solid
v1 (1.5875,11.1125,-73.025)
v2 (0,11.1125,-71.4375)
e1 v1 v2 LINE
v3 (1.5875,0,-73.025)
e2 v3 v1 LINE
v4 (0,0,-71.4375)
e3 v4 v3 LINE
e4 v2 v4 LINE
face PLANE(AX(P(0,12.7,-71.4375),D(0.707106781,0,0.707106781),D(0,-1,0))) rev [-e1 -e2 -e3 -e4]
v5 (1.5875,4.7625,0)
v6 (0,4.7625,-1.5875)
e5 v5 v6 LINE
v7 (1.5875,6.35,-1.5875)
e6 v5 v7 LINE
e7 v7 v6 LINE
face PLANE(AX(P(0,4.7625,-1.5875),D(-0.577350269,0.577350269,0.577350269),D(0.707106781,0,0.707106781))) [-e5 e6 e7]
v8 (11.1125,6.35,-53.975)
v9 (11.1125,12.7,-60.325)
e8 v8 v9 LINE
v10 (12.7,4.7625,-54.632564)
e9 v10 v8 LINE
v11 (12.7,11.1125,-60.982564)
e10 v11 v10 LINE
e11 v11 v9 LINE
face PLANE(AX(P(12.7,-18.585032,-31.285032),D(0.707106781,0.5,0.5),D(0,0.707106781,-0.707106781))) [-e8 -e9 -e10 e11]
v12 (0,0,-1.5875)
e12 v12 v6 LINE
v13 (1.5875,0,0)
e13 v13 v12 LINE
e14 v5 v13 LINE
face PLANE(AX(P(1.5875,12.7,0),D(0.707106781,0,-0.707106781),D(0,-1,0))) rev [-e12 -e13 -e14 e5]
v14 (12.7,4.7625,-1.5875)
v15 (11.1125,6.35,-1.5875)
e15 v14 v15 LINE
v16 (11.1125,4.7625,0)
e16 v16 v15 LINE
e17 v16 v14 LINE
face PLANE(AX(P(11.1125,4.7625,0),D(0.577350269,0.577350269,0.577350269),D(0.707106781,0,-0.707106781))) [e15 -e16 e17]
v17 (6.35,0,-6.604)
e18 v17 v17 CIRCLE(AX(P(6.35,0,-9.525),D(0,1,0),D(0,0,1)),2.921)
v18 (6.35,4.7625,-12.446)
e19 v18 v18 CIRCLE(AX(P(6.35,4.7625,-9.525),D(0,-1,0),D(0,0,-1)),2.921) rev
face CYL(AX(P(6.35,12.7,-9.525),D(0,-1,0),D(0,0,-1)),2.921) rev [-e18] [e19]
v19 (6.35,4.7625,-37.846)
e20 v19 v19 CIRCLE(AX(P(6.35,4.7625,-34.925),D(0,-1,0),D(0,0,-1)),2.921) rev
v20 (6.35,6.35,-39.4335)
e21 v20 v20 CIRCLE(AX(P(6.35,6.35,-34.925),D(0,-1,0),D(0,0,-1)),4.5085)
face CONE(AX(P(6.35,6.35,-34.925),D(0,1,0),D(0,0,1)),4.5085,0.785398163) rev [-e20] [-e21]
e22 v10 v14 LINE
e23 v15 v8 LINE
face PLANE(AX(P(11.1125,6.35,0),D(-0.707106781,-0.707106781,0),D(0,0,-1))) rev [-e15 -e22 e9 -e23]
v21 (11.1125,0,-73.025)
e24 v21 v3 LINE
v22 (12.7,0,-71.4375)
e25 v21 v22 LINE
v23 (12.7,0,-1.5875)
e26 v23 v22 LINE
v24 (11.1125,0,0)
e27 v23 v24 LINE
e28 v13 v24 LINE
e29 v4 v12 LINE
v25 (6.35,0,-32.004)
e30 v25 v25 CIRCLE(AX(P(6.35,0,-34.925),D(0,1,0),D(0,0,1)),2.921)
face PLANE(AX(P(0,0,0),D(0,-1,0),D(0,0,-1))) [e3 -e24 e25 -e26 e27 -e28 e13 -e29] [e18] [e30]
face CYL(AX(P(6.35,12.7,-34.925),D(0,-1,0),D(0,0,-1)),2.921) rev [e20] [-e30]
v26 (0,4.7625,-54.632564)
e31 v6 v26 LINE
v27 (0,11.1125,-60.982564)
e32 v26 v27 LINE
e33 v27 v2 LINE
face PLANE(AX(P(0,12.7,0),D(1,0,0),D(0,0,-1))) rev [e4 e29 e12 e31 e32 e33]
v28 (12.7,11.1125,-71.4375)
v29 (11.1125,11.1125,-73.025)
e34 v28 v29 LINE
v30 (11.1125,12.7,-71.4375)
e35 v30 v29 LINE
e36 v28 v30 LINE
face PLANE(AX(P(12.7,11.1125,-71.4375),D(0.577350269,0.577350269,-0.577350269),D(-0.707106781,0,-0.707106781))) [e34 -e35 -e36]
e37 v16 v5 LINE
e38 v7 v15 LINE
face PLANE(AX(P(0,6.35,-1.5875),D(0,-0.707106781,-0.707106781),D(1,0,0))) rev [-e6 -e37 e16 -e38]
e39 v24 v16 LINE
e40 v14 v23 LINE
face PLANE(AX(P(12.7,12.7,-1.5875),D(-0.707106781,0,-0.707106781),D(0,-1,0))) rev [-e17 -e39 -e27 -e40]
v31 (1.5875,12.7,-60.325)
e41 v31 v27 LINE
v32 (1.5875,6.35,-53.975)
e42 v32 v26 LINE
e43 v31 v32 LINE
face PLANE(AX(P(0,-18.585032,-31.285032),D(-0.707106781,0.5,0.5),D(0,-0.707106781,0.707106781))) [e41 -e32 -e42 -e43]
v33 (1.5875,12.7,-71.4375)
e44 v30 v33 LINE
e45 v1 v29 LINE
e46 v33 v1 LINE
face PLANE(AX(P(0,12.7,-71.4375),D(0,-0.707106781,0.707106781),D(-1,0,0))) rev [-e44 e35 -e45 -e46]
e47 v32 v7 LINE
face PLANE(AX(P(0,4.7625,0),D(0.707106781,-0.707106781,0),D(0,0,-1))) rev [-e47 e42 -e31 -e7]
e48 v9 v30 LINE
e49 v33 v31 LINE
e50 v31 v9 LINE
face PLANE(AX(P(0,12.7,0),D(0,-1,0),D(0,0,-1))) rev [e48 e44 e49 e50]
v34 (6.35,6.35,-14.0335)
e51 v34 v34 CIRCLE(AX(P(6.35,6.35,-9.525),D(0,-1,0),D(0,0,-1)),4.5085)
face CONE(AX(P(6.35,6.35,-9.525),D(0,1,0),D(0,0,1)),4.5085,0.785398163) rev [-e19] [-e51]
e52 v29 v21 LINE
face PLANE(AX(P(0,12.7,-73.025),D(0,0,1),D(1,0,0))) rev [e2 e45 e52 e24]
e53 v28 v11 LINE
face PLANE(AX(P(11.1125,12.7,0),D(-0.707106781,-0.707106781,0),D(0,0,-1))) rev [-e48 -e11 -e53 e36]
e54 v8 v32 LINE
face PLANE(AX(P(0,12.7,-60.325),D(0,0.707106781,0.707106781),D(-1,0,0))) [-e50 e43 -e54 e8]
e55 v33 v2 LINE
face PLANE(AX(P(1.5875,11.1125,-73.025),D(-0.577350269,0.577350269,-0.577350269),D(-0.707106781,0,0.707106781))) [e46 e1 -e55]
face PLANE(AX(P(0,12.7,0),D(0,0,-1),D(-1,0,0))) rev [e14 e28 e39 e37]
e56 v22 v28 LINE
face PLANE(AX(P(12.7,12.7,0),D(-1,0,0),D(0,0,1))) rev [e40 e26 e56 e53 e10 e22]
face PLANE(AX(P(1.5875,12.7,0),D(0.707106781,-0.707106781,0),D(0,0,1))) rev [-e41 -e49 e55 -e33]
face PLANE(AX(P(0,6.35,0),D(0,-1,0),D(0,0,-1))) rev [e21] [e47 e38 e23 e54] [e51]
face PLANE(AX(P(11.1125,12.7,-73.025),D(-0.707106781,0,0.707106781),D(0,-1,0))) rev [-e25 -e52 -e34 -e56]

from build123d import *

# Parameters (mm, degrees)
SKETCH1_W           = 12.7
SKETCH1_H           = 73.025
SKETCH1_R           = 2.921
BOSS_EXTRUDE1_DEPTH = 12.7
SKETCH2_W           = 60.325
SKETCH2_H           = 6.35
CUT_EXTRUDE1_DEPTH  = 76.201267443
CHAMFER1_SIZE       = 6.35


# Some blends are built 0.0001 mm under size
with BuildPart() as part:
    # Sketch1 → Boss-Extrude1 (new body)
    with BuildSketch(Plane(origin=(0, 0, 0), x_dir=(1, 0, 0), z_dir=(0, 1, 0))):
        with Locations((6.35, 36.5125)):
            Rectangle(SKETCH1_W, SKETCH1_H)
        with Locations(Location((6.35, 9.525, 0), (0, 0, 270))):
            Circle(SKETCH1_R, mode=Mode.SUBTRACT)
        with Locations(Location((6.35, 34.925, 0), (0, 0, 270))):
            Circle(SKETCH1_R, mode=Mode.SUBTRACT)
    extrude(amount=BOSS_EXTRUDE1_DEPTH)

    # Sketch2 → Cut-Extrude1 (cut, through all)
    with BuildSketch(Plane(origin=(12.7, 0, 0), x_dir=(0, 0, -1), z_dir=(1, 0, 0))):
        with Locations((30.1625, 9.525)):
            Rectangle(SKETCH2_W, SKETCH2_H)
    extrude(amount=-CUT_EXTRUDE1_DEPTH, mode=Mode.SUBTRACT)

    # Chamfer1
    chamfer1_edges = [part.edges().sort_by_distance(p)[0] for p in [
        (6.35, 6.35, -60.325),
    ]]
    chamfer(chamfer1_edges, length=CHAMFER1_SIZE - 0.0001)  # a hair under: the kernel refuses the full size

    # Chamfer2
    # the kernel refuses this chamfer: 1.5875 mm, written as the material it takes off along each edge
    with BuildSketch(Plane(origin=(11.641666667, 11.641666667, -71.966666667), x_dir=(-0.7071067811865476, 0.7071067811865476, 0), z_dir=(0.5773502691896264, 0.5773502691896264, -0.5773502691896245)), Plane(origin=(1.058333333, 5.291666667, -1.058333333), x_dir=(0.7071067811865476, 0.7071067811865476, 3.1649107828586326e-15), z_dir=(-0.5773502691896274, 0.5773502691896248, 0.5773502691896252))) as chamfer2_piece_1:
        Polygon((-1.122532015, 0.648094161), (1.122532015, 0.648094161), (0, -1.296188322), align=None)
    extrude(amount=2.016395815, mode=Mode.SUBTRACT)
    with BuildSketch(Plane(origin=(1.058333333, 11.641666667, -71.966666667), x_dir=(0.7071067811865476, 0.7071067811865476, 0), z_dir=(-0.5773502691896264, 0.5773502691896264, -0.5773502691896245)), Plane(origin=(11.641666667, 5.291666667, -1.058333333), x_dir=(-0.7071067811865476, 0.7071067811865476, 0), z_dir=(0.577350269189626, 0.5773502691896254, 0.5773502691896262))) as chamfer2_piece_2:
        Polygon((-1.122532015, -0.648094161), (1.122532015, -0.648094161), (0, 1.296188322), align=None)
    extrude(amount=2.016395815, mode=Mode.SUBTRACT)
    with BuildSketch(Plane(origin=(16.782546743, 12.7, -73.025), x_dir=(0, 0.027495876610586667, 0.9996219169112968), z_dir=(-1, 0, 0)), Plane(origin=(0, 12.7, -77.107546743), x_dir=(0.9996219169112968, 0.02749587661058674, 0), z_dir=(0, 0, 1)), Plane(origin=(0, -4.082546743, -73.025), x_dir=(0.9996219169112968, 0, -0.02749587661058565), z_dir=(0, 1, 0)), Plane(origin=(12.7, -4.082546743, -73.025), x_dir=(0.027495876610586667, 0, 0.9996219169112968), z_dir=(0, 1, 0))) as chamfer2_piece_3:
        with BuildLine():
            Line((1.633018697, 0), (-0.089768608, -1.630549497))
            Line((-0.089768608, -1.630549497), (-0.121506604, -1.629676503))
            ThreePointArc((-0.121506604, -1.629676503), (-0.054180148, -0.815019055), (-0.031737996, 0.000872994))
            Line((-0.031737996, 0.000872994), (0.000872994, 0.031737996))
            ThreePointArc((0.000872994, 0.031737996), (0.816765043, 0.009295844), (1.633891691, 0.031737996))
            Line((1.633891691, 0.031737996), (1.633018697, 0))
        make_face()
    extrude(amount=20.865093487, mode=Mode.SUBTRACT)
    with BuildSketch(Plane(origin=(12.7, 12.7, -56.242453257), x_dir=(0.027495876610586726, -0.9996219169112968, 0), z_dir=(0, 0, -1)), Plane(origin=(16.782546743, 6.35, 0), x_dir=(0, 0.027495876610586223, -0.9996219169112968), z_dir=(-1, 0, 0))) as chamfer2_piece_4:
        with BuildLine():
            Line((1.633018697, 0), (-0.089768608, 1.630549497))
            Line((-0.089768608, 1.630549497), (-0.121506604, 1.629676503))
            ThreePointArc((-0.121506604, 1.629676503), (-0.054180148, 0.815019055), (-0.031737996, -0.000872994))
            Line((-0.031737996, -0.000872994), (0.000872994, -0.031737996))
            ThreePointArc((0.000872994, -0.031737996), (0.816765043, -0.009295844), (1.633891691, -0.031737996))
            Line((1.633891691, -0.031737996), (1.633018697, 0))
        make_face()
    extrude(amount=20.865093487, mode=Mode.SUBTRACT)
    with BuildSketch(Plane(origin=(12.7, -4.082546743, 0), x_dir=(0.027495876610586743, 0, -0.9996219169112966), z_dir=(0, 1, 0)), Plane(origin=(0, -4.082546743, 0), x_dir=(0.9996219169112966, 0, 0.027495876610586424), z_dir=(0, 1, 0))) as chamfer2_piece_5:
        with BuildLine():
            Line((1.633018697, 0), (-0.089768608, 1.630549497))
            Line((-0.089768608, 1.630549497), (-0.121506604, 1.629676503))
            ThreePointArc((-0.121506604, 1.629676503), (-0.054180148, 0.815019055), (-0.031737996, -0.000872994))
            Line((-0.031737996, -0.000872994), (0.000872994, -0.031737996))
            ThreePointArc((0.000872994, -0.031737996), (0.816765043, -0.009295844), (1.633891691, -0.031737996))
            Line((1.633891691, -0.031737996), (1.633018697, 0))
        make_face()
    extrude(amount=14.515093487, mode=Mode.SUBTRACT)
    with BuildSketch(Plane(origin=(6.35, 6.35, -9.525), x_dir=(0, 0, 1), z_dir=(1, 0, 0))) as chamfer2_piece_6:
        with BuildLine():
            Line((4.553401281, -0.044901281), (2.876098719, 1.632401281))
            Line((2.876098719, 1.632401281), (2.844348719, 1.632401281))
            ThreePointArc((2.844348719, 1.632401281), (2.88925, 0.81620064), (2.88925, 0))
            Line((2.88925, 0), (2.921, -0.03175))
            ThreePointArc((2.921, -0.03175), (3.73720064, -0.03175), (4.553401281, -0.076651281))
            Line((4.553401281, -0.076651281), (4.553401281, -0.044901281))
        make_face()
    revolve(axis=Axis((6.35, 6.35, -9.525), (0, -1, 0)), mode=Mode.SUBTRACT)
    with BuildSketch(Plane(origin=(6.35, 6.35, -34.925), x_dir=(0, 0, 1), z_dir=(1, 0, 0))) as chamfer2_piece_7:
        with BuildLine():
            Line((4.553401281, -0.044901281), (2.876098719, 1.632401281))
            Line((2.876098719, 1.632401281), (2.844348719, 1.632401281))
            ThreePointArc((2.844348719, 1.632401281), (2.88925, 0.81620064), (2.88925, 0))
            Line((2.88925, 0), (2.921, -0.03175))
            ThreePointArc((2.921, -0.03175), (3.73720064, -0.03175), (4.553401281, -0.076651281))
            Line((4.553401281, -0.076651281), (4.553401281, -0.044901281))
        make_face()
    revolve(axis=Axis((6.35, 6.35, -34.925), (0, -1, 0)), mode=Mode.SUBTRACT)
    with BuildSketch(Plane(origin=(0, 6.35, -58.057646743), x_dir=(0.9996219169112968, 0.027495876610586195, 0), z_dir=(0, 0, 1))) as chamfer2_piece_8_section:
        with BuildLine():
            Line((1.633018697, 0), (-0.089768608, -1.630549497))
            Line((-0.089768608, -1.630549497), (-0.121506604, -1.629676503))
            ThreePointArc((-0.121506604, -1.629676503), (-0.054180148, -0.815019055), (-0.031737996, 0.000872994))
            Line((-0.031737996, 0.000872994), (0.000872994, 0.031737996))
            ThreePointArc((0.000872994, 0.031737996), (0.816765043, 0.009295844), (1.633891691, 0.031737996))
            Line((1.633891691, 0.031737996), (1.633018697, 0))
        make_face()
    chamfer2_piece_8 = extrude(amount=62.140193487, mode=Mode.PRIVATE)
    chamfer2_piece_8 = split(chamfer2_piece_8, bisect_by=Plane(origin=(0.525034433, -8.55498603, -39.07011397), z_dir=(0, 0.7071067811865474, 0.7071067811865477)), keep=Keep.TOP, mode=Mode.PRIVATE)
    add(chamfer2_piece_8, mode=Mode.SUBTRACT)
    with BuildSketch(Plane(origin=(12.7, 6.35, -58.057646743), x_dir=(0.02749587661058674, -0.9996219169112966, 0), z_dir=(0, 0, 1))) as chamfer2_piece_9_section:
        with BuildLine():
            Line((1.633018697, 0), (-0.089768608, -1.630549497))
            Line((-0.089768608, -1.630549497), (-0.121506604, -1.629676503))
            ThreePointArc((-0.121506604, -1.629676503), (-0.054180148, -0.815019055), (-0.031737996, 0.000872994))
            Line((-0.031737996, 0.000872994), (0.000872994, 0.031737996))
            ThreePointArc((0.000872994, 0.031737996), (0.816765043, 0.009295844), (1.633891691, 0.031737996))
            Line((1.633891691, 0.031737996), (1.633018697, 0))
        make_face()
    chamfer2_piece_9 = extrude(amount=62.140193487, mode=Mode.PRIVATE)
    chamfer2_piece_9 = split(chamfer2_piece_9, bisect_by=Plane(origin=(12.174965567, -8.55498603, -39.07011397), z_dir=(0, 0.7071067811865474, 0.7071067811865477)), keep=Keep.TOP, mode=Mode.PRIVATE)
    add(chamfer2_piece_9, mode=Mode.SUBTRACT)
    with BuildSketch(Plane(origin=(12.7, 3.463203513, -51.088303513), x_dir=(0.02749587661058673, -0.7068394360706733, -0.7068394360706736), z_dir=(0, 0.7071067811865477, -0.7071067811865474))) as chamfer2_piece_10_section:
        with BuildLine():
            Line((1.633018697, 0), (-0.089768608, 1.630549497))
            Line((-0.089768608, 1.630549497), (-0.121506604, 1.629676503))
            ThreePointArc((-0.121506604, 1.629676503), (-0.054180148, 0.815019055), (-0.031737996, -0.000872994))
            Line((-0.031737996, -0.000872994), (0.000872994, -0.031737996))
            ThreePointArc((0.000872994, -0.031737996), (0.816765043, -0.009295844), (1.633891691, -0.031737996))
            Line((1.633891691, -0.031737996), (1.633018697, 0))
        make_face()
    chamfer2_piece_10 = extrude(amount=17.145208187, mode=Mode.PRIVATE)
    chamfer2_piece_10 = split(chamfer2_piece_10, bisect_by=Plane(origin=(12.154882998, 6.35, -57.491724347), z_dir=(0, 1, 0)), keep=Keep.TOP, mode=Mode.PRIVATE)
    add(chamfer2_piece_10, mode=Mode.SUBTRACT)
    with BuildSketch(Plane(origin=(0, 3.463203513, -51.088303513), x_dir=(0.9996219169112968, 0.019442520806015003, 0.019442520806015013), z_dir=(0, 0.7071067811865477, -0.7071067811865474))) as chamfer2_piece_11_section:
        with BuildLine():
            Line((1.633018697, 0), (-0.089768608, 1.630549497))
            Line((-0.089768608, 1.630549497), (-0.121506604, 1.629676503))
            ThreePointArc((-0.121506604, 1.629676503), (-0.054180148, 0.815019055), (-0.031737996, -0.000872994))
            Line((-0.031737996, -0.000872994), (0.000872994, -0.031737996))
            ThreePointArc((0.000872994, -0.031737996), (0.816765043, -0.009295844), (1.633891691, -0.031737996))
            Line((1.633891691, -0.031737996), (1.633018697, 0))
        make_face()
    chamfer2_piece_11 = extrude(amount=17.145208187, mode=Mode.PRIVATE)
    chamfer2_piece_11 = split(chamfer2_piece_11, bisect_by=Plane(origin=(0.545117002, 6.35, -57.491724347), z_dir=(0, 1, 0)), keep=Keep.TOP, mode=Mode.PRIVATE)
    add(chamfer2_piece_11, mode=Mode.SUBTRACT)
    with BuildSketch(Plane(origin=(0, 3.463203513, -51.088303513), x_dir=(0.9996219169112968, 0.019442520806015003, 0.019442520806015013), z_dir=(0, 0.7071067811865477, -0.7071067811865474))) as chamfer2_piece_12a_section:
        with BuildLine():
            Line((1.633018697, 0), (-0.089768608, 1.630549497))
            Line((-0.089768608, 1.630549497), (-0.121506604, 1.629676503))
            ThreePointArc((-0.121506604, 1.629676503), (-0.054180148, 0.815019055), (-0.031737996, -0.000872994))
            Line((-0.031737996, -0.000872994), (0.000872994, -0.031737996))
            ThreePointArc((0.000872994, -0.031737996), (0.816765043, -0.009295844), (1.633891691, -0.031737996))
            Line((1.633891691, -0.031737996), (1.633018697, 0))
        make_face()
    chamfer2_piece_12a = extrude(amount=17.145208187, mode=Mode.PRIVATE)
    chamfer2_piece_12a = split(chamfer2_piece_12a, bisect_by=Plane(origin=(0.504972836, 6.35, -53.123859696), z_dir=(0, -1, 0)), keep=Keep.TOP, mode=Mode.PRIVATE)
    with BuildSketch(Plane(origin=(0, 6.35, -58.057646743), x_dir=(0.9996219169112968, 0.027495876610586195, 0), z_dir=(0, 0, 1))) as chamfer2_piece_12b_section:
        with BuildLine():
            Line((1.633018697, 0), (-0.089768608, -1.630549497))
            Line((-0.089768608, -1.630549497), (-0.121506604, -1.629676503))
            ThreePointArc((-0.121506604, -1.629676503), (-0.054180148, -0.815019055), (-0.031737996, 0.000872994))
            Line((-0.031737996, 0.000872994), (0.000872994, 0.031737996))
            ThreePointArc((0.000872994, 0.031737996), (0.816765043, 0.009295844), (1.633891691, 0.031737996))
            Line((1.633891691, 0.031737996), (1.633018697, 0))
        make_face()
    chamfer2_piece_12b = extrude(amount=62.140193487, mode=Mode.PRIVATE)
    chamfer2_piece_12b = split(chamfer2_piece_12b, bisect_by=Plane(origin=(0.504972836, 6.951917791, -54.577017791), z_dir=(0, -0.7071067811865474, -0.7071067811865477)), keep=Keep.TOP, mode=Mode.PRIVATE)
    chamfer2_piece_12 = chamfer2_piece_12a & chamfer2_piece_12b
    add(chamfer2_piece_12, mode=Mode.SUBTRACT)
    with BuildSketch(Plane(origin=(12.7, 3.463203513, -51.088303513), x_dir=(0.02749587661058673, -0.7068394360706733, -0.7068394360706736), z_dir=(0, 0.7071067811865477, -0.7071067811865474))) as chamfer2_piece_13a_section:
        with BuildLine():
            Line((1.633018697, 0), (-0.089768608, 1.630549497))
            Line((-0.089768608, 1.630549497), (-0.121506604, 1.629676503))
            ThreePointArc((-0.121506604, 1.629676503), (-0.054180148, 0.815019055), (-0.031737996, -0.000872994))
            Line((-0.031737996, -0.000872994), (0.000872994, -0.031737996))
            ThreePointArc((0.000872994, -0.031737996), (0.816765043, -0.009295844), (1.633891691, -0.031737996))
            Line((1.633891691, -0.031737996), (1.633018697, 0))
        make_face()
    chamfer2_piece_13a = extrude(amount=17.145208187, mode=Mode.PRIVATE)
    chamfer2_piece_13a = split(chamfer2_piece_13a, bisect_by=Plane(origin=(12.195027164, 6.35, -53.123859696), z_dir=(0, -1, 0)), keep=Keep.TOP, mode=Mode.PRIVATE)
    with BuildSketch(Plane(origin=(12.7, 6.35, -58.057646743), x_dir=(0.02749587661058674, -0.9996219169112966, 0), z_dir=(0, 0, 1))) as chamfer2_piece_13b_section:
        with BuildLine():
            Line((1.633018697, 0), (-0.089768608, -1.630549497))
            Line((-0.089768608, -1.630549497), (-0.121506604, -1.629676503))
            ThreePointArc((-0.121506604, -1.629676503), (-0.054180148, -0.815019055), (-0.031737996, 0.000872994))
            Line((-0.031737996, 0.000872994), (0.000872994, 0.031737996))
            ThreePointArc((0.000872994, 0.031737996), (0.816765043, 0.009295844), (1.633891691, 0.031737996))
            Line((1.633891691, 0.031737996), (1.633018697, 0))
        make_face()
    chamfer2_piece_13b = extrude(amount=62.140193487, mode=Mode.PRIVATE)
    chamfer2_piece_13b = split(chamfer2_piece_13b, bisect_by=Plane(origin=(12.195027164, 6.951917791, -54.577017791), z_dir=(0, -0.7071067811865474, -0.7071067811865477)), keep=Keep.TOP, mode=Mode.PRIVATE)
    chamfer2_piece_13 = chamfer2_piece_13a & chamfer2_piece_13b
    add(chamfer2_piece_13, mode=Mode.SUBTRACT)


solid = part.part
